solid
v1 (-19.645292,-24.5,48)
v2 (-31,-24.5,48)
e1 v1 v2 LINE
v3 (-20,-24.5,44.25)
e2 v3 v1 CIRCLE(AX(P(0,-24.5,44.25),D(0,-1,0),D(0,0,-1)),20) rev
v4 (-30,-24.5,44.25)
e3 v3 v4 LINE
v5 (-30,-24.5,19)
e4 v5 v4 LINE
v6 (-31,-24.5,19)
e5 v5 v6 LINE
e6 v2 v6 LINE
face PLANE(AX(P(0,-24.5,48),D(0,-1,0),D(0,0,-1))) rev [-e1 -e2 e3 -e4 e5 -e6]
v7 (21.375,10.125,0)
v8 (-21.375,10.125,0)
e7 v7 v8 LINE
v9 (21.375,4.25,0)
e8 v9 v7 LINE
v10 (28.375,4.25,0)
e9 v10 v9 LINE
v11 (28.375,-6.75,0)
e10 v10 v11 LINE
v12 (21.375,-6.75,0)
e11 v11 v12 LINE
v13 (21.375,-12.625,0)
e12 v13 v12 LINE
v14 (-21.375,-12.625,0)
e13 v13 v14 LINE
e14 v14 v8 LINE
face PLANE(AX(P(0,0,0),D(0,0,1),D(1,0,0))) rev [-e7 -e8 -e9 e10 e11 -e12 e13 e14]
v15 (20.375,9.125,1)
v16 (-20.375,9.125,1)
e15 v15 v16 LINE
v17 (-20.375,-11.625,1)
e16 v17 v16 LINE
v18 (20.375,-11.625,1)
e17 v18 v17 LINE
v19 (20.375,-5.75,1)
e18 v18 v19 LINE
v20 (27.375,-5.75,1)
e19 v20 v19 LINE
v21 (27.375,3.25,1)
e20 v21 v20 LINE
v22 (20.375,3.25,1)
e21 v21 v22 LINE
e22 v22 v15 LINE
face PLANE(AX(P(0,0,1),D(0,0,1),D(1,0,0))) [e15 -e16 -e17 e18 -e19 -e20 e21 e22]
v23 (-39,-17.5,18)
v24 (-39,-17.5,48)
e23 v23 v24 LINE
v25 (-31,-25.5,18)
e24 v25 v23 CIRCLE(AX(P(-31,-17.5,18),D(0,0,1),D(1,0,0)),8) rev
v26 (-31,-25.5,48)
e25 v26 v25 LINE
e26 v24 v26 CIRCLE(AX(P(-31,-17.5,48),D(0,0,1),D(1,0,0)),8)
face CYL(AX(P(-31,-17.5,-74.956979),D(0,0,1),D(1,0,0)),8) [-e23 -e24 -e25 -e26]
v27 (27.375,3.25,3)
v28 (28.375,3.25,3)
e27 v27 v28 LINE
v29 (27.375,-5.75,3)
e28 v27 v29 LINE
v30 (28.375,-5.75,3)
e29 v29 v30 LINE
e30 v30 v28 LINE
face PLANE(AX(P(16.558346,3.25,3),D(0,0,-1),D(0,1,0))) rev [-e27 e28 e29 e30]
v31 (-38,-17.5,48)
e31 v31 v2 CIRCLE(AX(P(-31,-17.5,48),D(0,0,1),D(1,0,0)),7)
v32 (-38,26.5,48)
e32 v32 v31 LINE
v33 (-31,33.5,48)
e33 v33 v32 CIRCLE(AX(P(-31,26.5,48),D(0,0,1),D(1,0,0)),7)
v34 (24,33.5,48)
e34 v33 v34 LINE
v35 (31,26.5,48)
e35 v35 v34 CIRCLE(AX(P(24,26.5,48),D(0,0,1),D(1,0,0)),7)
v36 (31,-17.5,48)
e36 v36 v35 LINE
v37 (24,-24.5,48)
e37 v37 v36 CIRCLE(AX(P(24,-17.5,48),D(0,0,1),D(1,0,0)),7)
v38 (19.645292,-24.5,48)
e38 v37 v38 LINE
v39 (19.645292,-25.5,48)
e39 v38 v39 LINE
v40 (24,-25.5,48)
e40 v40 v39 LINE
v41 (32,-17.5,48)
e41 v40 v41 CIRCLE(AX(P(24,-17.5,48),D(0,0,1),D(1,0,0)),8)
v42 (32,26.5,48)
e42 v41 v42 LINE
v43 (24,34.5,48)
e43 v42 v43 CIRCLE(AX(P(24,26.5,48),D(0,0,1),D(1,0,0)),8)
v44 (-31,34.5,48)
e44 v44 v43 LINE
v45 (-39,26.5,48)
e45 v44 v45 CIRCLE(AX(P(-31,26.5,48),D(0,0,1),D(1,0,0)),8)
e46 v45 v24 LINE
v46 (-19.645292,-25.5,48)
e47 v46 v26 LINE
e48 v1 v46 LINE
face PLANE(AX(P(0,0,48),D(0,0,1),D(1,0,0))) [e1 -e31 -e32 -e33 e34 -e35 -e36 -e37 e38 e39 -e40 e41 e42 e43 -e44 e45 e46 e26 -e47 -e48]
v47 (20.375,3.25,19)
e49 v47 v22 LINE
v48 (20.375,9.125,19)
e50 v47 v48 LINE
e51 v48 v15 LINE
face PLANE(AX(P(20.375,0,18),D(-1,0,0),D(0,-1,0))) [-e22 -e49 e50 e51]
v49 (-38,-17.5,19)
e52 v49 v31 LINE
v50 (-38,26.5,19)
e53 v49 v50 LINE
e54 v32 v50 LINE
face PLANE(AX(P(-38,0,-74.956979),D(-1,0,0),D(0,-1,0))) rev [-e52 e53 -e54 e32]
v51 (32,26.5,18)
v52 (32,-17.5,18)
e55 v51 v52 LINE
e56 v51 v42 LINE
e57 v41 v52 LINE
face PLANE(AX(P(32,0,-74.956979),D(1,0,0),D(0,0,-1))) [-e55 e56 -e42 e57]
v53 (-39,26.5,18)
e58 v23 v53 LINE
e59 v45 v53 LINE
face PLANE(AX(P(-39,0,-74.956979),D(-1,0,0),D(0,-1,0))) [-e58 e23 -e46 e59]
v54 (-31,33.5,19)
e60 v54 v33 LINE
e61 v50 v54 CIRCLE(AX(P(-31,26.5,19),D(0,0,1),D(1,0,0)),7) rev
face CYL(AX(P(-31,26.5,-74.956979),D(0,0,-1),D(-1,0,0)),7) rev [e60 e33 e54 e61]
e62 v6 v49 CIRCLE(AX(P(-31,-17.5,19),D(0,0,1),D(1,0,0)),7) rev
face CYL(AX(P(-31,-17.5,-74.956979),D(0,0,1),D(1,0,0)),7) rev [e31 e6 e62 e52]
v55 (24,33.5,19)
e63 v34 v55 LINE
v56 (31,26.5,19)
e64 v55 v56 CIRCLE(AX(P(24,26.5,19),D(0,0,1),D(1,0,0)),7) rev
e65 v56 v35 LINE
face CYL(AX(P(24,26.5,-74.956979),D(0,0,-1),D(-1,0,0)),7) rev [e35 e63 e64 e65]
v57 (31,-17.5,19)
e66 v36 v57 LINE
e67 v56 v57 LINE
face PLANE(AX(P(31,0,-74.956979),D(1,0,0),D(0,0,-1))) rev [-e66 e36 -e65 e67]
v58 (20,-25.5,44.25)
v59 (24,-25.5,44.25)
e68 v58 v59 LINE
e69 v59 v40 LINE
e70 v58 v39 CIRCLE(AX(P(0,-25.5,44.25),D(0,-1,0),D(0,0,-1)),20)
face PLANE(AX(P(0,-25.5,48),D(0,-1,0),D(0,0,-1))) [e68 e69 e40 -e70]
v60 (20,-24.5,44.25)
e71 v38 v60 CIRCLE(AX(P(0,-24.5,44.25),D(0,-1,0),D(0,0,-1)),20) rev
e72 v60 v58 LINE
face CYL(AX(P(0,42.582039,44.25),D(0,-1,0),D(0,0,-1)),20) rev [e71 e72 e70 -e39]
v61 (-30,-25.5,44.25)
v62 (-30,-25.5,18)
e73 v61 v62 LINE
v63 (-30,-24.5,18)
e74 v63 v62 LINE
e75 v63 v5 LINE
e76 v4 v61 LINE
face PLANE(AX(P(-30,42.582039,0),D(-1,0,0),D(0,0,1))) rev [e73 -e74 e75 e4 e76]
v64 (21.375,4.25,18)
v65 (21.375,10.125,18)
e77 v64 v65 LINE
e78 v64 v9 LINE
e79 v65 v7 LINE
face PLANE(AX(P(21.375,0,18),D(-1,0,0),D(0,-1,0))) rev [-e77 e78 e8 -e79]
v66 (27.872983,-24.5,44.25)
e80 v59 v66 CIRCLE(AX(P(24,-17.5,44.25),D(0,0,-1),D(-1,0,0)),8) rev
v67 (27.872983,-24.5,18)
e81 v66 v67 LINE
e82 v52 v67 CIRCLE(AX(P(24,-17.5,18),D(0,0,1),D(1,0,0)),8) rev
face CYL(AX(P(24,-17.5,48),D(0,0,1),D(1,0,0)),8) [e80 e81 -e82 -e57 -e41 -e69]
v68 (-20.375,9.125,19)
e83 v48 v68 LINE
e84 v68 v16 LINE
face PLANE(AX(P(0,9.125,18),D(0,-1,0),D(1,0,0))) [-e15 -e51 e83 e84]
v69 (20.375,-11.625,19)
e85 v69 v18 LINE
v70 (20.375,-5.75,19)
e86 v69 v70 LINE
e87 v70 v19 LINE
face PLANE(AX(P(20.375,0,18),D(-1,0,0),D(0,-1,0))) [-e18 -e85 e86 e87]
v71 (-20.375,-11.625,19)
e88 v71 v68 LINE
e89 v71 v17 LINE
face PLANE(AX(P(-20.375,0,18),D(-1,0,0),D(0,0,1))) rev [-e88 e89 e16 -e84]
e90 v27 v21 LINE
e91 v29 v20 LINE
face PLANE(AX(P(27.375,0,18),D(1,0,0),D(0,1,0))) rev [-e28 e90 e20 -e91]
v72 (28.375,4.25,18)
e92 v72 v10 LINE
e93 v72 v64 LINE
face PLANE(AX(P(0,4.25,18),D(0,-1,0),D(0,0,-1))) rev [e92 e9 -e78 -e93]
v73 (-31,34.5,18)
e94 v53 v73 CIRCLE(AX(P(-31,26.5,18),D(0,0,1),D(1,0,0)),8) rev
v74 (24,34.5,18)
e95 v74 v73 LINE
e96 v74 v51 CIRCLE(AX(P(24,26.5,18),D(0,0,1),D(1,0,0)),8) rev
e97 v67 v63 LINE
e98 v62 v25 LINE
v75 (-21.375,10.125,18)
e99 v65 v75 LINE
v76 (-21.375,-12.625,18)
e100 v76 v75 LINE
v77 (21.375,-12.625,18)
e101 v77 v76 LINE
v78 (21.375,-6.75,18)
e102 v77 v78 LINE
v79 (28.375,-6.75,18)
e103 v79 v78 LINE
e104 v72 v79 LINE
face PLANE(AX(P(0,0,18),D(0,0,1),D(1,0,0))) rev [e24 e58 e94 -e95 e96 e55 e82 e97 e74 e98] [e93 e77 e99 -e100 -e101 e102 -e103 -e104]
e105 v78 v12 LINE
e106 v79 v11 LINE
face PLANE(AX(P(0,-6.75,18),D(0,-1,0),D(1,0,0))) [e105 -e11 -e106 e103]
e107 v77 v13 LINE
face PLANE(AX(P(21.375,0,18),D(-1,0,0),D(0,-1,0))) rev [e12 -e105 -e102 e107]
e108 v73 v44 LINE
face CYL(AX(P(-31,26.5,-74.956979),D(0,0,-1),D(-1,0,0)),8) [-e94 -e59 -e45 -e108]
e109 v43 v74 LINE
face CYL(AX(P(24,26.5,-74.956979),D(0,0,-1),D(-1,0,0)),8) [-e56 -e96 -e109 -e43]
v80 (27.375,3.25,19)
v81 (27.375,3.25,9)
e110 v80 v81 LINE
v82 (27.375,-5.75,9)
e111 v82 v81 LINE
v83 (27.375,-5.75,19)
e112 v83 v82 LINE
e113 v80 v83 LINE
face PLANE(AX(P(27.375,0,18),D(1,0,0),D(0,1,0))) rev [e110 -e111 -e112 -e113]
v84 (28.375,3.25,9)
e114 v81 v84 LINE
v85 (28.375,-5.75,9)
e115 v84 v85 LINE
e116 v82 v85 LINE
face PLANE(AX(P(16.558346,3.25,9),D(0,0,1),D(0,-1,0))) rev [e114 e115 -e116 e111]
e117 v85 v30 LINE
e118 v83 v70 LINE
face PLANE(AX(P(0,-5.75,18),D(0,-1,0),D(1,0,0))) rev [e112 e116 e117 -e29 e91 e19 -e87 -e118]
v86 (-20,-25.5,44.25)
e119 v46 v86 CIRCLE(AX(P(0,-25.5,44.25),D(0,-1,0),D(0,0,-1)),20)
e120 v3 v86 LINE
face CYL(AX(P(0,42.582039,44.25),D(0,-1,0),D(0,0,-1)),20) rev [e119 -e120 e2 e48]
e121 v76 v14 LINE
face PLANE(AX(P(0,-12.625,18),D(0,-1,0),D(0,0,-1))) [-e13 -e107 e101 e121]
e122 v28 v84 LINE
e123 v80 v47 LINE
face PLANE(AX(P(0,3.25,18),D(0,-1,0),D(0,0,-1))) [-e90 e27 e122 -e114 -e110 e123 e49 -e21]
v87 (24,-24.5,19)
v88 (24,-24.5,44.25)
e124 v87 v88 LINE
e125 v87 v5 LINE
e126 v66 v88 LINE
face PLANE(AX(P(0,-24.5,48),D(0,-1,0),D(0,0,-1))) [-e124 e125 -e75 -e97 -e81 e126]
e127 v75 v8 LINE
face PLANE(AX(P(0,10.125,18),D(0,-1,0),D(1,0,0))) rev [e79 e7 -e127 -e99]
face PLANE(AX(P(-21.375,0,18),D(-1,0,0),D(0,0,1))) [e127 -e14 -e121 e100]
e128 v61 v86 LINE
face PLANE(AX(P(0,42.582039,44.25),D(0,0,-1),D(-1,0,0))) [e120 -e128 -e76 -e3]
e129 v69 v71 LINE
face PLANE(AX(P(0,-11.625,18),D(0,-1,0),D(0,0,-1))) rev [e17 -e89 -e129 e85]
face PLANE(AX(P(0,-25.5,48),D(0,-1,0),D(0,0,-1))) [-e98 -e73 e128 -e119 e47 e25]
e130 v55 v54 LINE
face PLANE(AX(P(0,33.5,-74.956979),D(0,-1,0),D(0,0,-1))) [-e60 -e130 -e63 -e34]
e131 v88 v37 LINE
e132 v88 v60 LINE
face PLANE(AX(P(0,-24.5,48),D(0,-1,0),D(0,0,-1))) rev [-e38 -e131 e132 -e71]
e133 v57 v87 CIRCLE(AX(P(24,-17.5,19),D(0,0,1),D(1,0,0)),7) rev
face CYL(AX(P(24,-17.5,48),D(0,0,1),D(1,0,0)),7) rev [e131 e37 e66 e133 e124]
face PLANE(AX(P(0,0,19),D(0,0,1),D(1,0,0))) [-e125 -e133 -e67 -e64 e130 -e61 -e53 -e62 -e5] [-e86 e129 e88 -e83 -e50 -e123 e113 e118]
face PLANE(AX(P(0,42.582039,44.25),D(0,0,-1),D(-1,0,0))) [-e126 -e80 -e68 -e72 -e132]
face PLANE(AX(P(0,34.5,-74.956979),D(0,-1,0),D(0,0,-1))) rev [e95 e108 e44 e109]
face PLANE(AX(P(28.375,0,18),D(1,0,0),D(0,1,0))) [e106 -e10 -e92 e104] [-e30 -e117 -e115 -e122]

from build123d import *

# Parameters (mm, degrees)
SKETCH1_W               = 60
SKETCH1_H               = 51
BOSS_EXTRUDE3_DEPTH     = 48
CUT_EXTRUDE1_DEPTH      = 18
CUT_EXTRUDE2_DEPTH      = 77.190550595
CUT_EXTRUDE2_DEPTH_BACK = 11.25
SKETCH2_W               = 40
SKETCH2_H               = 18
BOSS_EXTRUDE4_DEPTH     = 30
FILLET1_R               = 8
SHELL1_T                = -1
CUT_EXTRUDE5_START      = -1
CUT_EXTRUDE5_DEPTH      = 1
SKETCH5_W               = 6
SKETCH5_H               = 9
CUT_EXTRUDE4_DEPTH      = 1


# Read off the part's stored shape, not the designer's step: Cut-Extrude5
with BuildPart() as part:
    # Sketch1 → Boss-Extrude3 (new body)
    with BuildSketch(Plane(origin=(0, 0, 0), x_dir=(-1, 0, 0), z_dir=(0, 0, -1))):
        Rectangle(SKETCH1_W, SKETCH1_H)
    extrude(amount=-BOSS_EXTRUDE3_DEPTH)

    # Sketch1<6> → Cut-Extrude1 (cut)
    with BuildSketch(Plane(origin=(0, 0, 0), x_dir=(-1, 0, 0), z_dir=(0, 0, -1))):
        Polygon((-20, -25.5), (-20, -14.25), (20, -14.25), (20, -25.5), (30, -25.5), (30, 25.5), (-30, 25.5), (-30, -25.5), align=None)
        Polygon((21.375, -12.625), (-21.375, -12.625), (-21.375, -6.75), (-28.375, -6.75), (-28.375, 4.25), (-21.375, 4.25), (-21.375, 10.125), (21.375, 10.125), align=None, mode=Mode.SUBTRACT)
    extrude(amount=-CUT_EXTRUDE1_DEPTH, mode=Mode.SUBTRACT)

    # Sketch2 → Cut-Extrude2 (cut, two sides: drawn at the far end of the back side and taken through both)
    with BuildSketch(Plane.XZ.offset(25.5).offset(-CUT_EXTRUDE2_DEPTH_BACK)):
        with Locations((0, 9)):
            Rectangle(SKETCH2_W, SKETCH2_H)
    extrude(amount=CUT_EXTRUDE2_DEPTH + CUT_EXTRUDE2_DEPTH_BACK, mode=Mode.SUBTRACT)

    # Sketch6 → Boss-Extrude4 (add)
    with BuildSketch(Plane.XY.offset(48)):
        Polygon((30, 25.5), (30, -25.5), (32, -25.5), (32, 34.5), (-39, 34.5), (-39, -25.5), (-30, -25.5), (-30, 25.5), align=None)
    extrude(amount=-BOSS_EXTRUDE4_DEPTH)

    # Fillet1
    fillet1_edges = [part.edges().sort_by_distance(p)[0] for p in [
        (-39, 34.5, 33),
        (32, 34.5, 33),
        (32, -25.5, 33),
        (-39, -25.5, 33),
    ]]
    fillet(fillet1_edges, radius=FILLET1_R)

    # Shell1
    shell1_openings = [part.faces().sort_by_distance(p)[0] for p in [
        (-3.5, 4.5, 48),
    ]]
    offset(amount=SHELL1_T, openings=shell1_openings, kind=Kind.INTERSECTION)

    # Cut-Extrude5 outline → Cut-Extrude5 (cut)
    with BuildSketch(Plane.XZ.offset(25.5).offset(CUT_EXTRUDE5_START)):
        with BuildLine():
            Line((29, 44.25), (20, 44.25))
            ThreePointArc((20, 44.25), (19.911125548, 46.13336917), (19.645292057, 48))
            Line((19.645292057, 48), (-19.645292057, 48))
            ThreePointArc((-19.645292057, 48), (-19.911125548, 46.13336917), (-20, 44.25))
            Line((-20, 44.25), (-30, 44.25))
            Line((-30, 44.25), (-30, 17))
            Line((-30, 17), (29, 17))
            Line((29, 17), (29, 44.25))
        make_face()
    extrude(amount=CUT_EXTRUDE5_DEPTH, mode=Mode.SUBTRACT)

    # Sketch5 → Cut-Extrude4 (cut)
    with BuildSketch(Plane(origin=(28.375, 0, 0), x_dir=(0, 0, -1), z_dir=(1, 0, 0))):
        with Locations((-6, -1.25)):
            Rectangle(SKETCH5_W, SKETCH5_H)
    extrude(amount=-CUT_EXTRUDE4_DEPTH, mode=Mode.SUBTRACT)


solid = part.part
